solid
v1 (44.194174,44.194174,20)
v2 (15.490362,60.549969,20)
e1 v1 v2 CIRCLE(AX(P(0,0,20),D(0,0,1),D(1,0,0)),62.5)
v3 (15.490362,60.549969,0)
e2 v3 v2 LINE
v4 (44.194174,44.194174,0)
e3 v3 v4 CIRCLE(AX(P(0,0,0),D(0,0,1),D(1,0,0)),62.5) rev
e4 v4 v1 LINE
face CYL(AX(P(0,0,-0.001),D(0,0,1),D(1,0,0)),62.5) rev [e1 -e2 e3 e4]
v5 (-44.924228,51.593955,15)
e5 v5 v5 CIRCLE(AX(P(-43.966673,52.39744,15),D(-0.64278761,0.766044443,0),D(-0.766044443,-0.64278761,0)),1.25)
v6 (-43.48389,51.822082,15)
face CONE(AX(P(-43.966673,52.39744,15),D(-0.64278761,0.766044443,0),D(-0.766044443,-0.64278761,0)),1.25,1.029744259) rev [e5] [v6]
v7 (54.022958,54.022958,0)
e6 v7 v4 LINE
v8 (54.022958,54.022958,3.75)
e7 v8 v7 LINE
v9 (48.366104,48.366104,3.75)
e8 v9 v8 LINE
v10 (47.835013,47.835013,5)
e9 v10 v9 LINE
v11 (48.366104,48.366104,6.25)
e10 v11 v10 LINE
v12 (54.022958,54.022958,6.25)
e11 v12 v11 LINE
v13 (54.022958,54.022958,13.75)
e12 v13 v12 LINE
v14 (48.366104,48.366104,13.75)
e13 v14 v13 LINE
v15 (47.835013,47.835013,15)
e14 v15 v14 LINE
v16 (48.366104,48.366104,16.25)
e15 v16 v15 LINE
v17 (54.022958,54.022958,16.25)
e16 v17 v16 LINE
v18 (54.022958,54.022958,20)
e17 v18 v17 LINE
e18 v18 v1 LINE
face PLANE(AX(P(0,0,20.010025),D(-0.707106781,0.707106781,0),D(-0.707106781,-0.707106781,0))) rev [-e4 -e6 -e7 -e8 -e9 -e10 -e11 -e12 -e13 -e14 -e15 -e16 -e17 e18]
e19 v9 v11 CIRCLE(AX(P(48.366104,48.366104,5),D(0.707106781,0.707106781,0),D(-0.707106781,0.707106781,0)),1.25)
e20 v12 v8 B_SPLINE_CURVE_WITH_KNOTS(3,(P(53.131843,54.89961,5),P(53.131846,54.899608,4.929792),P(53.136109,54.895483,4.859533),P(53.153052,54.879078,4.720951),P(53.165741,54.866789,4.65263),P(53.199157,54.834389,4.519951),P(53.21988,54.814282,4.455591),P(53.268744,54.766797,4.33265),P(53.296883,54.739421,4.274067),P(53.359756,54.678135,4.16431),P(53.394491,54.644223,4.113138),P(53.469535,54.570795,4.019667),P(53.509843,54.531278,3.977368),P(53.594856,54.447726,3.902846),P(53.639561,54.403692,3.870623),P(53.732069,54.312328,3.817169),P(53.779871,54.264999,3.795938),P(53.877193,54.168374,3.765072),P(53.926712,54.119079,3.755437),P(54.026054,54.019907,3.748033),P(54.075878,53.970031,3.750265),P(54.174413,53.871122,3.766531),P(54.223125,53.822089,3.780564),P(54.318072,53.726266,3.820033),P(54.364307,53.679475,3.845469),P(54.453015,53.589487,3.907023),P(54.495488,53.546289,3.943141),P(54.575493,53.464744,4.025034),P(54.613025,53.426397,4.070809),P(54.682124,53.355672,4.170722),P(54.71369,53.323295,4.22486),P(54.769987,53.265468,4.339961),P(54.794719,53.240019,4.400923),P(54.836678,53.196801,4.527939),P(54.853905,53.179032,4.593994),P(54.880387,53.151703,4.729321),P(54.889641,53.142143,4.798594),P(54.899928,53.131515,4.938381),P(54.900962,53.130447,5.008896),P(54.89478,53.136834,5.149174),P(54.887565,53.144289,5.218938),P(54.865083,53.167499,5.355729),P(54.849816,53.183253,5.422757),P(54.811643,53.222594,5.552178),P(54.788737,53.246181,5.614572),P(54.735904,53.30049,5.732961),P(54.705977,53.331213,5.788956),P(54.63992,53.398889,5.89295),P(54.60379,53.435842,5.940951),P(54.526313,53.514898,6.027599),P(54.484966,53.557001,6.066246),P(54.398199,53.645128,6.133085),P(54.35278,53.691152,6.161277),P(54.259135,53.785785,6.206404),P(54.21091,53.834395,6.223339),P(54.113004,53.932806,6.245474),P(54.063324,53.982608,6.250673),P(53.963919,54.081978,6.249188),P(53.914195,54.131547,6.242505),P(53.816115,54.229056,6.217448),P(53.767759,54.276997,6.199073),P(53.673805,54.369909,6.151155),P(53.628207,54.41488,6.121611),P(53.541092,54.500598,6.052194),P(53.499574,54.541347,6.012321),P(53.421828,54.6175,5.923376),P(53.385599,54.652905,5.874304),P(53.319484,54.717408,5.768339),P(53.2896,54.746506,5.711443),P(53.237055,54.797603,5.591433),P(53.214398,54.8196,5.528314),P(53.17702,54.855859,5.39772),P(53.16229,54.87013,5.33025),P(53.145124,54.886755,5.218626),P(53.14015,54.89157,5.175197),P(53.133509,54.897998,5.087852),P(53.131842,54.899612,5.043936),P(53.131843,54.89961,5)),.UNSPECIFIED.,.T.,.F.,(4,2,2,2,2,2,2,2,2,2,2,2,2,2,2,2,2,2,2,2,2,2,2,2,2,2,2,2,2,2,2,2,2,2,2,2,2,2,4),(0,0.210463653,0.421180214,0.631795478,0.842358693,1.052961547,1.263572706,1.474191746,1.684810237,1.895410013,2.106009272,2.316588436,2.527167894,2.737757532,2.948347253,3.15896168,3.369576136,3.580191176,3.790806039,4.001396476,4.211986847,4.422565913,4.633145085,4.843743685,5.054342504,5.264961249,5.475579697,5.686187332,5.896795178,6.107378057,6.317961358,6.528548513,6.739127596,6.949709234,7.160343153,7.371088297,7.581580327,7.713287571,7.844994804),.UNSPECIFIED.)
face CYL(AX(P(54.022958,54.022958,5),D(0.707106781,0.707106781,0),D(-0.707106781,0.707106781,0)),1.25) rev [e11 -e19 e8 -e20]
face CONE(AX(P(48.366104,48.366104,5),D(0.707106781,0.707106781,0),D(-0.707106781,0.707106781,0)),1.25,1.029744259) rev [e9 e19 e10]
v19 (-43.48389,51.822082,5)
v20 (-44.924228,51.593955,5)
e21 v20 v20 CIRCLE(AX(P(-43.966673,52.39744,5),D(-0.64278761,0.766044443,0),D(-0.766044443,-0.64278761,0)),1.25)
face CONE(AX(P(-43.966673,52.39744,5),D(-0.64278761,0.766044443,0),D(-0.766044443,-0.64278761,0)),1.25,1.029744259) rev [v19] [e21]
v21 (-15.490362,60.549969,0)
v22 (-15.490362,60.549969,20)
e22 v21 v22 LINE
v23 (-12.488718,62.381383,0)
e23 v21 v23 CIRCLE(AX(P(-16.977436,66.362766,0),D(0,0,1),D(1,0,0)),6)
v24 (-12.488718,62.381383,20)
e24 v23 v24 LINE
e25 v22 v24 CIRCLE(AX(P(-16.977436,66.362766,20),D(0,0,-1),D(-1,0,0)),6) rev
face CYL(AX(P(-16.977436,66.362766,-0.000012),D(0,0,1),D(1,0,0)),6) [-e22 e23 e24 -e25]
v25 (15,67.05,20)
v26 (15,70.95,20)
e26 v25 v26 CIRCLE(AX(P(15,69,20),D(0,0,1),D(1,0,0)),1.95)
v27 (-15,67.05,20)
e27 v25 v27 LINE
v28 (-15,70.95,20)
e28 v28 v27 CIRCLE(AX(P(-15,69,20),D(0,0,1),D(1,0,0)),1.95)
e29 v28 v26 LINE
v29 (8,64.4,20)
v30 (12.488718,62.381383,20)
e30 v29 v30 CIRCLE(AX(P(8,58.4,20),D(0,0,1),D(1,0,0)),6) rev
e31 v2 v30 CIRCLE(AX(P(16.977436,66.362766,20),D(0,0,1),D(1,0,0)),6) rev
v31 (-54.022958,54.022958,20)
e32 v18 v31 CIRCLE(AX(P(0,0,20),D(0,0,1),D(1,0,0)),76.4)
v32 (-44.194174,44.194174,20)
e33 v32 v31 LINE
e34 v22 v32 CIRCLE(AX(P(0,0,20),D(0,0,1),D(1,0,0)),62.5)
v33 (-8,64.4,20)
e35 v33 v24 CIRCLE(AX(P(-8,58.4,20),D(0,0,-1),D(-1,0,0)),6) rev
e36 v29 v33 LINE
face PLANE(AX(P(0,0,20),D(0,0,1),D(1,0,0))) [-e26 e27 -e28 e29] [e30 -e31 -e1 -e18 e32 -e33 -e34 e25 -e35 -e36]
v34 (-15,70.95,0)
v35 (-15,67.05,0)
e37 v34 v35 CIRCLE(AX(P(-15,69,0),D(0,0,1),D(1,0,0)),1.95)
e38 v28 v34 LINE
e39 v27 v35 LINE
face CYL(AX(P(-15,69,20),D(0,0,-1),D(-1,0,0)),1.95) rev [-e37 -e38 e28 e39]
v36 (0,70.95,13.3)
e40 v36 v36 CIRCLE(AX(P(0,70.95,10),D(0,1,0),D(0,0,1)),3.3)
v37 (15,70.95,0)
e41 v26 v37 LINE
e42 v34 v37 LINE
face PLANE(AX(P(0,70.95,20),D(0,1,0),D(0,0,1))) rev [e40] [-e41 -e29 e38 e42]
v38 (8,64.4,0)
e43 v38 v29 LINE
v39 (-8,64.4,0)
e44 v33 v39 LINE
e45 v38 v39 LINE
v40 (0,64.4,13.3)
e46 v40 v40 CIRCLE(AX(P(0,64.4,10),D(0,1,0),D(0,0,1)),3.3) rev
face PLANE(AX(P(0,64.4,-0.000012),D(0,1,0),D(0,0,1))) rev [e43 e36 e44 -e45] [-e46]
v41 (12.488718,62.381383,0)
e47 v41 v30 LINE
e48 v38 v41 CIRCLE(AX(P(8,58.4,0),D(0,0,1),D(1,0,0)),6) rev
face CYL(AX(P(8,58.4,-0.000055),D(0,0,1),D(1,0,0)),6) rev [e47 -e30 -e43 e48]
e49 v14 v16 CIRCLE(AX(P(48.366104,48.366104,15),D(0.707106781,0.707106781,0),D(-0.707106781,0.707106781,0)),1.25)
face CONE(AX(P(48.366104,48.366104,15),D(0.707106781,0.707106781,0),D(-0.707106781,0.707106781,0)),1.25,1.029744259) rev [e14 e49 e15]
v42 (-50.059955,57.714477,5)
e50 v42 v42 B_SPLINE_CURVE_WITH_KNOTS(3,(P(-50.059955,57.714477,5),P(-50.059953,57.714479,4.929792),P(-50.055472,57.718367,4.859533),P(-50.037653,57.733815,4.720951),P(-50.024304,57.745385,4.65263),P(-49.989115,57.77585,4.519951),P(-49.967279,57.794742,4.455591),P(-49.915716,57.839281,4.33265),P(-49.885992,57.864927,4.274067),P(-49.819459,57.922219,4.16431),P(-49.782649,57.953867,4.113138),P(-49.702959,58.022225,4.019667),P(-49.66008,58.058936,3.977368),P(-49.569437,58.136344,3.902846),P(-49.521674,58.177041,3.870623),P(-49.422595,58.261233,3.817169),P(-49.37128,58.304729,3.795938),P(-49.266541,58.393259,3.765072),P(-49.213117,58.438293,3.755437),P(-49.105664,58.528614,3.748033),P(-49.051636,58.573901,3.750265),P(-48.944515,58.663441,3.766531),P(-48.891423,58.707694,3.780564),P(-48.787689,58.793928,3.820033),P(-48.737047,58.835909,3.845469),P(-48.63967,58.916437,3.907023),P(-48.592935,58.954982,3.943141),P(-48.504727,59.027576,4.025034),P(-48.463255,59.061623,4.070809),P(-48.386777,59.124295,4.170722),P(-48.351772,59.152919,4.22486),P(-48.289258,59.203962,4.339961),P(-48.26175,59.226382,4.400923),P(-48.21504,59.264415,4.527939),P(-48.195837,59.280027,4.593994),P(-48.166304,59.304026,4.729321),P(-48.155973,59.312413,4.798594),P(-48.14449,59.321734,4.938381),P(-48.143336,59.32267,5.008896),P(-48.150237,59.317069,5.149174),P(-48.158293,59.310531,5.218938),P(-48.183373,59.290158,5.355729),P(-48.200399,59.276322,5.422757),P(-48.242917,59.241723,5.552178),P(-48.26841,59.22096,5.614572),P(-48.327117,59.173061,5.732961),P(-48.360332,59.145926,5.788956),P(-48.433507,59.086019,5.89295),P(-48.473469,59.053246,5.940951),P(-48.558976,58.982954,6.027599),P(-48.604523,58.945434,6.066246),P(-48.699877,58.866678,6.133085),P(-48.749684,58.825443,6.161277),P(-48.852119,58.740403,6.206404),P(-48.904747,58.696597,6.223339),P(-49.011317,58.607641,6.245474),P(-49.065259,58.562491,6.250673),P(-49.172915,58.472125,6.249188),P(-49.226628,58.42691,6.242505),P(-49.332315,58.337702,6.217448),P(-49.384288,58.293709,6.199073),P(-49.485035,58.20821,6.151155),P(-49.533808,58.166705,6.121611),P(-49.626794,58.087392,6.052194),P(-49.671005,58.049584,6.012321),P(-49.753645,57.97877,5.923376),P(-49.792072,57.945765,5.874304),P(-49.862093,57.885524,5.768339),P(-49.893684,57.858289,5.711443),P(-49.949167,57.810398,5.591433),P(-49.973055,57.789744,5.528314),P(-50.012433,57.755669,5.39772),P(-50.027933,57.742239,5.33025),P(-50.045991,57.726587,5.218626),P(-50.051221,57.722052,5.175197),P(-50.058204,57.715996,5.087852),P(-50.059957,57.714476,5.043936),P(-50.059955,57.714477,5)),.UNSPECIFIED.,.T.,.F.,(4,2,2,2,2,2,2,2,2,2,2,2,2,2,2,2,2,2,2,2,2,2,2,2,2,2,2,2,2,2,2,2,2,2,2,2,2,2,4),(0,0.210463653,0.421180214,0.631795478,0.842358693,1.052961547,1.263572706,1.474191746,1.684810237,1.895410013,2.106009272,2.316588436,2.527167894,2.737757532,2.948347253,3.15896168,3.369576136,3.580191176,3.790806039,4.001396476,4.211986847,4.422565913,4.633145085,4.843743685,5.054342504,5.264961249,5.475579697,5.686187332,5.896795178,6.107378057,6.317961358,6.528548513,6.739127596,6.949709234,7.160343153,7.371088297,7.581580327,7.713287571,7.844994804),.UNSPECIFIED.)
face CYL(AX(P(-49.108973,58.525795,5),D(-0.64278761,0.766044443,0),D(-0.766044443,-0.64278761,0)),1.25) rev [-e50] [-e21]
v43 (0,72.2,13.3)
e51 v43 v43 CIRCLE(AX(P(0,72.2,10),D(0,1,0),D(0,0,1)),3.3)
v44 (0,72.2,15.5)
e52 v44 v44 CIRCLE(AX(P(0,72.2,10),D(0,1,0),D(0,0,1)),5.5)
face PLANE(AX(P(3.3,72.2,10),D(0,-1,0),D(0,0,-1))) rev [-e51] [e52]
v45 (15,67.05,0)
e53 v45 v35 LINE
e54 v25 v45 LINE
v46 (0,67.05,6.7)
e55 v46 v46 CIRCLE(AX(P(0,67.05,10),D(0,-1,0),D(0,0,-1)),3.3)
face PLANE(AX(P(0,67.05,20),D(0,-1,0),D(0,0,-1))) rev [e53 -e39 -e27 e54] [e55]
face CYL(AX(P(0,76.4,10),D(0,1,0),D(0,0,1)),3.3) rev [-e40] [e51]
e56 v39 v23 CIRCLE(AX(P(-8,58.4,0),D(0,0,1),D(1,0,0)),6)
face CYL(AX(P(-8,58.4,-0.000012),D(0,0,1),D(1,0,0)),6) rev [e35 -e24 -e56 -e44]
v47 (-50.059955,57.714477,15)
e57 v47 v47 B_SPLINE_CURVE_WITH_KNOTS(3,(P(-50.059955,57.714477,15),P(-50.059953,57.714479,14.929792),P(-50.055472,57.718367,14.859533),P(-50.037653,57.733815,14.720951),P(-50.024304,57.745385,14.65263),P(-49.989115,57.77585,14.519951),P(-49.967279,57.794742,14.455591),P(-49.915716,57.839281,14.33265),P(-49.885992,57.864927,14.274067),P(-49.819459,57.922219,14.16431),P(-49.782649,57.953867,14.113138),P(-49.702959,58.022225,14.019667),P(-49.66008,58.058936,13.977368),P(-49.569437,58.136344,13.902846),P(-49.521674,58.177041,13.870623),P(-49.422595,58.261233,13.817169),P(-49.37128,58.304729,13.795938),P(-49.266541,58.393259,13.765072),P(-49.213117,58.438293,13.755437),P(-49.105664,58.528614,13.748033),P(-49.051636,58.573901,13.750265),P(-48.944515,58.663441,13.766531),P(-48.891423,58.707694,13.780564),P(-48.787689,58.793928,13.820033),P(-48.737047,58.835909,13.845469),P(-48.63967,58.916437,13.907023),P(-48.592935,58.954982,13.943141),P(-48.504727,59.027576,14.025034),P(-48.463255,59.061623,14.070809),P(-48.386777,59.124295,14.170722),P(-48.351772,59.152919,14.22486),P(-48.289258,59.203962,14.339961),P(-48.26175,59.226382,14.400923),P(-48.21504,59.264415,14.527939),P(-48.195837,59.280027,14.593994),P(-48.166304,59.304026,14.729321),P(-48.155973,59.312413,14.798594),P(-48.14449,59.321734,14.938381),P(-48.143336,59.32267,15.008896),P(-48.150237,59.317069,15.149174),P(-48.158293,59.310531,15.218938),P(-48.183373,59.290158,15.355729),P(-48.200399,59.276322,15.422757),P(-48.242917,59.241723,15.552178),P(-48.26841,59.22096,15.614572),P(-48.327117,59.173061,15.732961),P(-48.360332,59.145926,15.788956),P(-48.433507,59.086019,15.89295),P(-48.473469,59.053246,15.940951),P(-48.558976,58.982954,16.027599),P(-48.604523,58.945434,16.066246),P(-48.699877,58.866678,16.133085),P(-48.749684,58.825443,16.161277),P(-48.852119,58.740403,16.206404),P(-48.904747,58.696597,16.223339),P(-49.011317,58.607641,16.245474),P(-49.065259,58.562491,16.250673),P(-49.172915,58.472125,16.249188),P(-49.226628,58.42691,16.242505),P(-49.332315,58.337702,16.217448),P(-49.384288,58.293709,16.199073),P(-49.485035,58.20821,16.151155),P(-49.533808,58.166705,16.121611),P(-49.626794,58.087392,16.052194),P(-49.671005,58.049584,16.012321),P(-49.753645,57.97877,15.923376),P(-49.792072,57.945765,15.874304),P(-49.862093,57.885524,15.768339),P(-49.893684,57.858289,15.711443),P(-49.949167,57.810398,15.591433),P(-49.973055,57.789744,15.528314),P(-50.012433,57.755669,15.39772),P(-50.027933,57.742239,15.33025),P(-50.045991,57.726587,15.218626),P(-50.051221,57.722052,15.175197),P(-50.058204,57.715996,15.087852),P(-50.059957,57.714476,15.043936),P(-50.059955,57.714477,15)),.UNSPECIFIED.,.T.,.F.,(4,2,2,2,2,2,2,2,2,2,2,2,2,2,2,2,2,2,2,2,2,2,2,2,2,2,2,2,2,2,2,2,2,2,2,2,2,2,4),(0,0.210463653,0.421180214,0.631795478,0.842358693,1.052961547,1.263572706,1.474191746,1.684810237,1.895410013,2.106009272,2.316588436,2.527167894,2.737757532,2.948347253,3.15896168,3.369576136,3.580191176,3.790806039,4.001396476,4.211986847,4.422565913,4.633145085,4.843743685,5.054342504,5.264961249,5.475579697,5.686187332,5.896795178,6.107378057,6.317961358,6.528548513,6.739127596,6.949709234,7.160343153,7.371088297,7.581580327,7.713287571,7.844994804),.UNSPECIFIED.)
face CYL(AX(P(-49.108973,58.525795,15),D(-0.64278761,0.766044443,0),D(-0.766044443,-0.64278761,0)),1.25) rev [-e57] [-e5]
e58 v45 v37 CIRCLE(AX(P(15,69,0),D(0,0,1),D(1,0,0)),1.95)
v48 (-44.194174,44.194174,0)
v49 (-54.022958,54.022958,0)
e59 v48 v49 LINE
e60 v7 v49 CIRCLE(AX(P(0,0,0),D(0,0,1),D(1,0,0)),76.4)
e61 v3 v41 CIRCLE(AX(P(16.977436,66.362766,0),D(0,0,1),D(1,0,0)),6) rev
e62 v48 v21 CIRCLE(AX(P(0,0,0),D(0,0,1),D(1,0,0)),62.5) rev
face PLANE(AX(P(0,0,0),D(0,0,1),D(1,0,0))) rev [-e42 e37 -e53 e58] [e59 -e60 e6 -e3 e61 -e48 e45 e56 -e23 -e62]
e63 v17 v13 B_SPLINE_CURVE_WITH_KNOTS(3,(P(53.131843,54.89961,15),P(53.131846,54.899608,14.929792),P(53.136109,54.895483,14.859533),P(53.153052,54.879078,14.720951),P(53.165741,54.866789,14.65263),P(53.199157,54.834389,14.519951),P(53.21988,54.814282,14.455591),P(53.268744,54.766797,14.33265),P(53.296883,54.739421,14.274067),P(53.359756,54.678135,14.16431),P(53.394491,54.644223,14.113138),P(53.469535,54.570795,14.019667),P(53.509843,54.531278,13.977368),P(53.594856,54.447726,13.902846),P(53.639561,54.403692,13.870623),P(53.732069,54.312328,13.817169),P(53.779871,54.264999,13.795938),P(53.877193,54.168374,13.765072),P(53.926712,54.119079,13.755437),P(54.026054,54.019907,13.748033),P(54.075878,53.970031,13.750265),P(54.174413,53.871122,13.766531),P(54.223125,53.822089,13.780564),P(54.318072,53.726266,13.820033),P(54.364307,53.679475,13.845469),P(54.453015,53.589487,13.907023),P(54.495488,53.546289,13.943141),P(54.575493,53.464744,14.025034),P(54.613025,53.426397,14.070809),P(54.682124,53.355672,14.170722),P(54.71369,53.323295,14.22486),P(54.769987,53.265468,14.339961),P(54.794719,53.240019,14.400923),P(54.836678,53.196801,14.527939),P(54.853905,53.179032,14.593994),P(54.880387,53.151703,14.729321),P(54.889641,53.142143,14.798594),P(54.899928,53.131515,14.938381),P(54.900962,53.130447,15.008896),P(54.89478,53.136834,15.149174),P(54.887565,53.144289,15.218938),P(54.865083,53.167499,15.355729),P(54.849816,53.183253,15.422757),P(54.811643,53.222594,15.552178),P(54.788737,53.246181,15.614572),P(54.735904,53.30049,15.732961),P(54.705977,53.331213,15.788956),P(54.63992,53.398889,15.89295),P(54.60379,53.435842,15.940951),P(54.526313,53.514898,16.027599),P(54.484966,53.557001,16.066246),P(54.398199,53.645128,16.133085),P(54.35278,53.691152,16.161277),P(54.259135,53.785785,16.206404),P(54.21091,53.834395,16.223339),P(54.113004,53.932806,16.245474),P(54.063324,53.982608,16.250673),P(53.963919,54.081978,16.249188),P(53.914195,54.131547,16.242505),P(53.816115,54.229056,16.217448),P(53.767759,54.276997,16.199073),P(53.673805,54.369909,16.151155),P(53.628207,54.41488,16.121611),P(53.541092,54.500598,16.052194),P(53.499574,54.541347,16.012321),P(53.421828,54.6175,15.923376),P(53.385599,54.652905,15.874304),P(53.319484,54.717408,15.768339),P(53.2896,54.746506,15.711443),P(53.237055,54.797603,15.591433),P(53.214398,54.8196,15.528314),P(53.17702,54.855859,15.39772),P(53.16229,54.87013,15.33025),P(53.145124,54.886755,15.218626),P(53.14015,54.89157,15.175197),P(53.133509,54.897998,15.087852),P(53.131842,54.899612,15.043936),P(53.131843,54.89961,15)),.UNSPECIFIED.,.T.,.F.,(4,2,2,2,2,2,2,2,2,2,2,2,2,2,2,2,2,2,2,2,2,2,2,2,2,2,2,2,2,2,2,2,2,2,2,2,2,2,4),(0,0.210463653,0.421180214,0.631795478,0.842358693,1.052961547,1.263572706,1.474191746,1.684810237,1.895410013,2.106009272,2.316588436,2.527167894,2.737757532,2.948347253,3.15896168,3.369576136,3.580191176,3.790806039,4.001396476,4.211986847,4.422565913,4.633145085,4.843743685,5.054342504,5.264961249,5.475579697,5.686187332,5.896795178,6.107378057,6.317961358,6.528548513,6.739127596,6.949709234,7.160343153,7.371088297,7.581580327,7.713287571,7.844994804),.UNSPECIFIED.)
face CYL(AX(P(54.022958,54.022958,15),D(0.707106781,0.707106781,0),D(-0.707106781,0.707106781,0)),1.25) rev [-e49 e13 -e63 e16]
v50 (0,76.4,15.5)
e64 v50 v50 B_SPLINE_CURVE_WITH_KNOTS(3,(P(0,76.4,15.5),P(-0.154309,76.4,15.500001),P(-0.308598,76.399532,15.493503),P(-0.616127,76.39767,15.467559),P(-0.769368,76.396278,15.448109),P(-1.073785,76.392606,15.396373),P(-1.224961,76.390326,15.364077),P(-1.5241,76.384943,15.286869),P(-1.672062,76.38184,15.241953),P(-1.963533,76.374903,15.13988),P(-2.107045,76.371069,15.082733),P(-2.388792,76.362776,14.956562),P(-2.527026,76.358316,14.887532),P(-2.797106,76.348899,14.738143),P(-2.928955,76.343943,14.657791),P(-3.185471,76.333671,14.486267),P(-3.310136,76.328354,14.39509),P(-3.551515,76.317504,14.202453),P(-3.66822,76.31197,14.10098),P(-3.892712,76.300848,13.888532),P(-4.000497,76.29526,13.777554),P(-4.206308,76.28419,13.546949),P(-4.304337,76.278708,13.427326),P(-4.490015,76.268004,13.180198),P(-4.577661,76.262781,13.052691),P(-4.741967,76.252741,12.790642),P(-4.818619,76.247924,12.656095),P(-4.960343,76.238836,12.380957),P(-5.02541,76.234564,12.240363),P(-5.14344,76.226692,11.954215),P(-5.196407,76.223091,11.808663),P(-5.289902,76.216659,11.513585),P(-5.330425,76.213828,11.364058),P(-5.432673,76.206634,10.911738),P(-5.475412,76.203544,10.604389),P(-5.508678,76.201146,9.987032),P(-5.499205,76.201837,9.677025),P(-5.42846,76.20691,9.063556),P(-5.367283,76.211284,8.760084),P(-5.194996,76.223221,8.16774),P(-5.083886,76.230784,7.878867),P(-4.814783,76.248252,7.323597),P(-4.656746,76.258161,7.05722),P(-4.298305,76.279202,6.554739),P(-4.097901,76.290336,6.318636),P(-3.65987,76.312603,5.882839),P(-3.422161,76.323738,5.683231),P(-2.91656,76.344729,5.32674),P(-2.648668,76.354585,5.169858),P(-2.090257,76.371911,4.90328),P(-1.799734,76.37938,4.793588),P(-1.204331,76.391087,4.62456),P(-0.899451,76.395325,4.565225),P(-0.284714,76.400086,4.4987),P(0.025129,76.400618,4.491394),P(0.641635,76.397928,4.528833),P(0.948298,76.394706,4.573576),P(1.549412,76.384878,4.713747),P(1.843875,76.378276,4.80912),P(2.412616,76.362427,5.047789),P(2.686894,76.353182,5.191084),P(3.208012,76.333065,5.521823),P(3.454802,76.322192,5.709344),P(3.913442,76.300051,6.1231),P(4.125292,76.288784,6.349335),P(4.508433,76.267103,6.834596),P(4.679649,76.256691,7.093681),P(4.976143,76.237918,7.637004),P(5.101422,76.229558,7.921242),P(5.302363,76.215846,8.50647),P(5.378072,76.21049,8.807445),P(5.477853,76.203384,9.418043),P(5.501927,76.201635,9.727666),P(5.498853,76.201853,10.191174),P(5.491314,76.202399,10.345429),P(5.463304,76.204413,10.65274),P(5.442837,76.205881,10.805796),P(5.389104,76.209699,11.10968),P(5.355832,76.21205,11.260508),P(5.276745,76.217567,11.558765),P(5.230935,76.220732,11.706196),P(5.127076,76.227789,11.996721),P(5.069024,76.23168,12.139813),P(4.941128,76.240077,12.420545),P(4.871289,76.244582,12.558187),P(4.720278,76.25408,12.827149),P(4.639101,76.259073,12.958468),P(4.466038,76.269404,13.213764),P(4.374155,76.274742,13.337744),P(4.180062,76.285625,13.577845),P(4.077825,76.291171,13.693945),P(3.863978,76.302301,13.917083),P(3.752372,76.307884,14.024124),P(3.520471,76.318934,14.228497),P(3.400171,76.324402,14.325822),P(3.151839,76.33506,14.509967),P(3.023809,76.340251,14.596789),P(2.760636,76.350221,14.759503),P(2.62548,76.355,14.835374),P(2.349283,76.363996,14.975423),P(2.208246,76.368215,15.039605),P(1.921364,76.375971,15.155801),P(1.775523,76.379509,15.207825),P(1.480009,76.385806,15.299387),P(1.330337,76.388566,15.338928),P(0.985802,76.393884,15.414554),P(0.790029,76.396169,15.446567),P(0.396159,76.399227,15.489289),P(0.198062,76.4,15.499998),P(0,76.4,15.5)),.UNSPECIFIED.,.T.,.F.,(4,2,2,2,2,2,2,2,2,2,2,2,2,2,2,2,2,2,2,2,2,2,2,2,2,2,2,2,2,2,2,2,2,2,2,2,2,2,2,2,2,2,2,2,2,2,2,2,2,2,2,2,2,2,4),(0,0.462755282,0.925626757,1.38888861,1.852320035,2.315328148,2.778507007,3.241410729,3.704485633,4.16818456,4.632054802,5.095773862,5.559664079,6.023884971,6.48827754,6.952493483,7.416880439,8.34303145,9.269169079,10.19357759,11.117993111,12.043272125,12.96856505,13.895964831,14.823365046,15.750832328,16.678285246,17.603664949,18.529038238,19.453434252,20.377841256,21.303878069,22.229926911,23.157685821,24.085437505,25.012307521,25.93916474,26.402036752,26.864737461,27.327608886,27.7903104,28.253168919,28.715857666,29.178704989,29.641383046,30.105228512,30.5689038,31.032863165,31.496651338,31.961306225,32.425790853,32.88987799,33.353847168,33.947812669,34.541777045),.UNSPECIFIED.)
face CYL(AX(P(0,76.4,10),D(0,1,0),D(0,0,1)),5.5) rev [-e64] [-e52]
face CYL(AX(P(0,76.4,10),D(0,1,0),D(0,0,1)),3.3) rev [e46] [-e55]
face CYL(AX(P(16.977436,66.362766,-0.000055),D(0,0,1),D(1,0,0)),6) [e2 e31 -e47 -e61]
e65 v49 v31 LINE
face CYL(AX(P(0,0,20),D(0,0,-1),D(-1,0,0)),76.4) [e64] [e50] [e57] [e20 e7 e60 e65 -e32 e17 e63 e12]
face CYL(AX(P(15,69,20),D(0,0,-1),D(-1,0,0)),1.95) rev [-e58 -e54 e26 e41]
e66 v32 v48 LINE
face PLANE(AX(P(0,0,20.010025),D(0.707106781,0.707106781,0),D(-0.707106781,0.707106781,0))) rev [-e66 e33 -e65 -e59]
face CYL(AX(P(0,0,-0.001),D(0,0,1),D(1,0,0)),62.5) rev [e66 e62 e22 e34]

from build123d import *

# Parameters (mm, degrees)
SKETCH1_R                    = 76.4
BOSS_EXTRUDE1_DEPTH          = 20
CUT_EXTRUDE1_REACH           = 111.881
SKETCH2_R                    = 62.5
CUT_EXTRUDE2_DEPTH           = 110.881390599
CIRPATTERN1_COUNT            = 4
R_P_TITION_CIRCULAIRE2_COUNT = 4
CUT_EXTRUDE4_START           = -20
CUT_EXTRUDE4_DEPTH           = 130.881390756
CIRPATTERN8_COUNT            = 4
CIRPATTERN8_START            = -20
CIRPATTERN8_COPY_1_DEPTH     = 130.881390756
CIRPATTERN8_COPY_2_DEPTH     = 130.881390756
CIRPATTERN8_COPY_3_DEPTH     = 130.881390756
SPLIT1_SURFACE_1_BACK        = 218.015
SPLIT1_SURFACE_1_DEPTH       = 436.03


# Read off the part's stored shape, not the designer's step: Répétition circulaire1, Répétition linéaire1
with BuildPart() as part:
    # Sketch1 → Boss-Extrude1 (new body)
    with BuildSketch(Plane.XY):
        Circle(SKETCH1_R)
    extrude(amount=BOSS_EXTRUDE1_DEPTH)

    # Sketch2 → Cut-Extrude1 (cut, up to next)
    with BuildSketch(Plane.XY.offset(20), mode=Mode.PRIVATE) as cut_extrude1_sk1:
        Circle(SKETCH2_R)
    cut_extrude1_tool1 = extrude(cut_extrude1_sk1.sketch, amount=-CUT_EXTRUDE1_REACH, mode=Mode.PRIVATE) & part.part
    add(cut_extrude1_tool1.solids().sort_by_distance((0, 0, 20))[0], mode=Mode.SUBTRACT)

    # Sketch39 → Cut-Extrude2 (cut, through all)
    with BuildSketch(Plane(origin=(0, 0, 0), x_dir=(-1, 0, 0), z_dir=(0, 0, -1))):
        with BuildLine():
            Line((-15, 70.95), (15, 70.95))
            ThreePointArc((15, 70.95), (16.95, 69), (15, 67.05))
            Line((15, 67.05), (-15, 67.05))
            ThreePointArc((-15, 67.05), (-16.95, 69), (-15, 70.95))
        make_face()
    cut_extrude2 = extrude(amount=-CUT_EXTRUDE2_DEPTH, mode=Mode.SUBTRACT)

    # CirPattern1: Cut-Extrude2 ×4 about axis
    cirpattern1_axis = Axis((0, 0, 0), (0, 0, 1))
    for i in range(1, CIRPATTERN1_COUNT):
        add(cut_extrude2.rotate(cirpattern1_axis, i * 360 / CIRPATTERN1_COUNT), mode=Mode.SUBTRACT)

    # Esquisse2 → M3 Tapped Hole1 (revolve, cut)
    with BuildSketch(Plane(origin=(49.10897338, -58.525795454, 5), x_dir=(0.766044443118979, 0.6427876096865381, 0), z_dir=(0, 0, 1))):
        Polygon((0, 0), (0, 8.751075774), (1.25, 8), (1.25, 0), align=None)
    revolve(axis=Axis((53.190674702, -63.390177668, 5), (-0.6427876096865383, 0.766044443118979, 0)), mode=Mode.SUBTRACT)

    # Esquisse2 at point 2 (carried to point 2, square into its face) → M3 Tapped Hole1 at 2 (revolve, cut)
    with BuildSketch(Plane(origin=(-54.022958083, -54.022958083, 5), x_dir=(0.707106781, -0.707106781, 0), z_dir=(0, 0, 1))):
        Polygon((0, 0), (0, 8.751075774), (1.25, 8), (1.25, 0), align=None)
    revolve(axis=Axis((-58.513086143, -58.513086143, 5), (0.707106781, 0.707106781, 0)), mode=Mode.SUBTRACT)

    # Esquisse2 at point 3 (carried to point 3, square into its face) → M3 Tapped Hole1 at 3 (revolve, cut)
    with BuildSketch(Plane(origin=(-58.525795454, 49.10897338, 5), x_dir=(-0.642788057, -0.766044068, 0), z_dir=(0, 0, 1))):
        Polygon((0, 0), (0, 8.751075774), (1.25, 8), (1.25, 0), align=None)
    revolve(axis=Axis((-63.390175285, 53.190677542, 5), (0.766044068, -0.642788057, 0)), mode=Mode.SUBTRACT)

    # Répétition circulaire1 outline → Répétition circulaire1 (revolve, cut)
    with BuildSketch(Plane(origin=(0, 0, 5), x_dir=(0.6427876096865408, 0.7660444431189769, 0), z_dir=(0, 0, -1))):
        Polygon((0, 67.648924226), (1.25, 68.4), (1.25, 76.400001412), (0, 76.400001412), align=None)
    revolve(axis=Axis((0, 0, 5), (0.7660444431189771, -0.6427876096865409, 0)), mode=Mode.SUBTRACT)

    # R_p_tition circulaire1 2 outline → R_p_tition circulaire1 2 (revolve, cut)
    with BuildSketch(Plane(origin=(0, 0, 5), x_dir=(0.707106781186546, -0.707106781186549, 0), z_dir=(0, 0, 1))):
        Polygon((0, 67.648924226), (1.25, 68.4), (1.25, 76.400001412), (0, 76.400001412), align=None)
    revolve(axis=Axis((0, 0, 5), (0.707106781186549, 0.707106781186546, 0)), mode=Mode.SUBTRACT)

    # R_p_tition circulaire1 3 outline → R_p_tition circulaire1 3 (revolve, cut)
    with BuildSketch(Plane(origin=(0, 0, 5), x_dir=(0.7660444431189789, 0.6427876096865381, 0), z_dir=(0, 0, -1))):
        Polygon((1.25, -76.400001412), (1.25, -68.4), (0, -67.648924226), (0, -76.400001412), align=None)
    revolve(axis=Axis((0, 0, 5), (0.6427876096865381, -0.7660444431189789, 0)), mode=Mode.SUBTRACT)

    # Répétition linéaire1 outline → Répétition linéaire1 (revolve, cut)
    with BuildSketch(Plane(origin=(0, 0, 15), x_dir=(0.6427876096865408, 0.7660444431189769, 0), z_dir=(0, 0, -1))):
        Polygon((1.25, -76.400001412), (1.25, -68.4), (0, -67.648924226), (0, -76.400001412), align=None)
        Polygon((0, 76.400001412), (0, 67.648924226), (1.25, 68.4), (1.25, 76.400001412), align=None)
    revolve(axis=Axis((0, 0, 15), (0.7660444431189771, -0.6427876096865409, 0)), mode=Mode.SUBTRACT)

    # R_p_tition lin_aire1 2 outline → R_p_tition lin_aire1 2 (revolve, cut)
    with BuildSketch(Plane(origin=(0, 0, 15), x_dir=(0.707106781186546, -0.707106781186549, 0), z_dir=(0, 0, 1))):
        Polygon((1.25, -76.400001412), (1.25, -68.4), (0, -67.648924226), (0, -76.400001412), align=None)
        Polygon((0, 76.400001412), (0, 67.648924226), (1.25, 68.4), (1.25, 76.400001412), align=None)
    revolve(axis=Axis((0, 0, 15), (0.707106781186549, 0.707106781186546, 0)), mode=Mode.SUBTRACT)

    # R_p_tition lin_aire1 3 outline → R_p_tition lin_aire1 3 (revolve, cut)
    with BuildSketch(Plane(origin=(0, 0, 15), x_dir=(0.7660444431189789, 0.6427876096865381, 0), z_dir=(0, 0, -1))):
        Polygon((0, 67.648924226), (1.25, 68.4), (1.25, 76.400001412), (0, 76.400001412), align=None)
        Polygon((1.25, -68.4), (0, -67.648924226), (0, -76.400001412), (1.25, -76.400001412), align=None)
    revolve(axis=Axis((0, 0, 15), (0.6427876096865381, -0.7660444431189789, 0)), mode=Mode.SUBTRACT)

    # Esquisse4 → CBORE for M6 Hex Socket Head Cap Screw1 (revolve, cut)
    with BuildSketch(Plane(origin=(0, 76.4, 10), x_dir=(0, 0, 1), z_dir=(1, 0, 0))):
        Polygon((0, 0), (0, 30.482840043), (3.3, 28.5), (3.3, 4.2), (5.5, 4.2), (5.5, 0), align=None)
    cbore_for_m6_hex_socket_head_cap_screw1 = revolve(axis=Axis((0, 82.75, 10), (0, -1, 0)), mode=Mode.SUBTRACT)

    # Répétition circulaire2: CBORE for M6 Hex Socket Head Cap Screw1 ×4 about axis
    r_p_tition_circulaire2_axis = Axis((0, 0, 0), (0, 0, 1))
    for i in range(1, R_P_TITION_CIRCULAIRE2_COUNT):
        add(cbore_for_m6_hex_socket_head_cap_screw1.rotate(r_p_tition_circulaire2_axis, i * 360 / R_P_TITION_CIRCULAIRE2_COUNT), mode=Mode.SUBTRACT)

    # Sketch47 → Cut-Extrude4 (cut)
    with BuildSketch(Plane(origin=(0, 0, 0), x_dir=(-1, 0, 0), z_dir=(0, 0, -1)).offset(CUT_EXTRUDE4_START)):
        with BuildLine():
            Line((8, 64.4), (0, 64.4))
            Line((0, 64.4), (0, 62.5))
            ThreePointArc((0, 62.5), (7.806310396, 62.010575856), (15.490361696, 60.549968576))
            ThreePointArc((15.490361696, 60.549968576), (13.852369253, 61.240856226), (12.488718209, 62.38138278))
            ThreePointArc((12.488718209, 62.38138278), (10.460864007, 63.872124664), (8, 64.4))
        make_face()
    cut_extrude4 = extrude(amount=CUT_EXTRUDE4_DEPTH, mode=Mode.SUBTRACT)

    # Mirror1: Cut-Extrude4 across plane
    add(cut_extrude4.mirror(Plane.ZY), mode=Mode.SUBTRACT)

    # CirPattern8: Cut-Extrude4 ×4 about axis
    cirpattern8_axis = Axis((0, 0, 0), (0, 0, 1))
    for i in range(1, CIRPATTERN8_COUNT):
        add(cut_extrude4.rotate(cirpattern8_axis, i * 360 / CIRPATTERN8_COUNT), mode=Mode.SUBTRACT)

    # CirPattern8 copy 1 sketch → CirPattern8 copy 1 (cut)
    with BuildSketch(Plane.YX.offset(CIRPATTERN8_START)):
        with BuildLine():
            Line((8, -64.4), (0, -64.4))
            Line((0, -64.4), (0, -62.5))
            ThreePointArc((0, -62.5), (7.806310396, -62.010575856), (15.490361696, -60.549968576))
            ThreePointArc((15.490361696, -60.549968576), (13.852369253, -61.240856226), (12.488718209, -62.38138278))
            ThreePointArc((12.488718209, -62.38138278), (10.460864007, -63.872124664), (8, -64.4))
        make_face()
    extrude(amount=CIRPATTERN8_COPY_1_DEPTH, mode=Mode.SUBTRACT)

    # CirPattern8 copy 2 sketch → CirPattern8 copy 2 (cut)
    with BuildSketch(Plane(origin=(0, 0, 0), x_dir=(-1, 0, 0), z_dir=(0, 0, -1)).offset(CIRPATTERN8_START)):
        with BuildLine():
            Line((8, -64.4), (0, -64.4))
            Line((0, -64.4), (0, -62.5))
            ThreePointArc((0, -62.5), (7.806310396, -62.010575856), (15.490361696, -60.549968576))
            ThreePointArc((15.490361696, -60.549968576), (13.852369253, -61.240856226), (12.488718209, -62.38138278))
            ThreePointArc((12.488718209, -62.38138278), (10.460864007, -63.872124664), (8, -64.4))
        make_face()
    extrude(amount=CIRPATTERN8_COPY_2_DEPTH, mode=Mode.SUBTRACT)

    # CirPattern8 copy 3 sketch → CirPattern8 copy 3 (cut)
    with BuildSketch(Plane(origin=(0, 0, 0), x_dir=(0, -1, 0), z_dir=(0, 0, -1)).offset(CIRPATTERN8_START)):
        with BuildLine():
            Line((8, -64.4), (0, -64.4))
            Line((0, -64.4), (0, -62.5))
            ThreePointArc((0, -62.5), (7.806310396, -62.010575856), (15.490361696, -60.549968576))
            ThreePointArc((15.490361696, -60.549968576), (13.852369253, -61.240856226), (12.488718209, -62.38138278))
            ThreePointArc((12.488718209, -62.38138278), (10.460864007, -63.872124664), (8, -64.4))
        make_face()
    extrude(amount=CIRPATTERN8_COPY_3_DEPTH, mode=Mode.SUBTRACT)

    # Split1: cut with a surface, the side behind it stays
    # Split1 surface: a surface, the sketch's curves swept straight by 436.03 mm
    with BuildLine(Plane(origin=(0, 0, 0), x_dir=(-1, 0, 0), z_dir=(0, 0, -1)).offset(-SPLIT1_SURFACE_1_BACK), mode=Mode.PRIVATE) as split1_surface_1_path:
        Line((73.828428705, 73.828428705), (0, 0))
        Line((0, 0), (-82.641961486, 82.641961486))
    split1_surface_1 = Shell.extrude(split1_surface_1_path.wire(), (0 * SPLIT1_SURFACE_1_DEPTH, 0 * SPLIT1_SURFACE_1_DEPTH, -1 * SPLIT1_SURFACE_1_DEPTH))
    split(bisect_by=split1_surface_1, keep=Keep.BOTTOM)


solid = part.part
